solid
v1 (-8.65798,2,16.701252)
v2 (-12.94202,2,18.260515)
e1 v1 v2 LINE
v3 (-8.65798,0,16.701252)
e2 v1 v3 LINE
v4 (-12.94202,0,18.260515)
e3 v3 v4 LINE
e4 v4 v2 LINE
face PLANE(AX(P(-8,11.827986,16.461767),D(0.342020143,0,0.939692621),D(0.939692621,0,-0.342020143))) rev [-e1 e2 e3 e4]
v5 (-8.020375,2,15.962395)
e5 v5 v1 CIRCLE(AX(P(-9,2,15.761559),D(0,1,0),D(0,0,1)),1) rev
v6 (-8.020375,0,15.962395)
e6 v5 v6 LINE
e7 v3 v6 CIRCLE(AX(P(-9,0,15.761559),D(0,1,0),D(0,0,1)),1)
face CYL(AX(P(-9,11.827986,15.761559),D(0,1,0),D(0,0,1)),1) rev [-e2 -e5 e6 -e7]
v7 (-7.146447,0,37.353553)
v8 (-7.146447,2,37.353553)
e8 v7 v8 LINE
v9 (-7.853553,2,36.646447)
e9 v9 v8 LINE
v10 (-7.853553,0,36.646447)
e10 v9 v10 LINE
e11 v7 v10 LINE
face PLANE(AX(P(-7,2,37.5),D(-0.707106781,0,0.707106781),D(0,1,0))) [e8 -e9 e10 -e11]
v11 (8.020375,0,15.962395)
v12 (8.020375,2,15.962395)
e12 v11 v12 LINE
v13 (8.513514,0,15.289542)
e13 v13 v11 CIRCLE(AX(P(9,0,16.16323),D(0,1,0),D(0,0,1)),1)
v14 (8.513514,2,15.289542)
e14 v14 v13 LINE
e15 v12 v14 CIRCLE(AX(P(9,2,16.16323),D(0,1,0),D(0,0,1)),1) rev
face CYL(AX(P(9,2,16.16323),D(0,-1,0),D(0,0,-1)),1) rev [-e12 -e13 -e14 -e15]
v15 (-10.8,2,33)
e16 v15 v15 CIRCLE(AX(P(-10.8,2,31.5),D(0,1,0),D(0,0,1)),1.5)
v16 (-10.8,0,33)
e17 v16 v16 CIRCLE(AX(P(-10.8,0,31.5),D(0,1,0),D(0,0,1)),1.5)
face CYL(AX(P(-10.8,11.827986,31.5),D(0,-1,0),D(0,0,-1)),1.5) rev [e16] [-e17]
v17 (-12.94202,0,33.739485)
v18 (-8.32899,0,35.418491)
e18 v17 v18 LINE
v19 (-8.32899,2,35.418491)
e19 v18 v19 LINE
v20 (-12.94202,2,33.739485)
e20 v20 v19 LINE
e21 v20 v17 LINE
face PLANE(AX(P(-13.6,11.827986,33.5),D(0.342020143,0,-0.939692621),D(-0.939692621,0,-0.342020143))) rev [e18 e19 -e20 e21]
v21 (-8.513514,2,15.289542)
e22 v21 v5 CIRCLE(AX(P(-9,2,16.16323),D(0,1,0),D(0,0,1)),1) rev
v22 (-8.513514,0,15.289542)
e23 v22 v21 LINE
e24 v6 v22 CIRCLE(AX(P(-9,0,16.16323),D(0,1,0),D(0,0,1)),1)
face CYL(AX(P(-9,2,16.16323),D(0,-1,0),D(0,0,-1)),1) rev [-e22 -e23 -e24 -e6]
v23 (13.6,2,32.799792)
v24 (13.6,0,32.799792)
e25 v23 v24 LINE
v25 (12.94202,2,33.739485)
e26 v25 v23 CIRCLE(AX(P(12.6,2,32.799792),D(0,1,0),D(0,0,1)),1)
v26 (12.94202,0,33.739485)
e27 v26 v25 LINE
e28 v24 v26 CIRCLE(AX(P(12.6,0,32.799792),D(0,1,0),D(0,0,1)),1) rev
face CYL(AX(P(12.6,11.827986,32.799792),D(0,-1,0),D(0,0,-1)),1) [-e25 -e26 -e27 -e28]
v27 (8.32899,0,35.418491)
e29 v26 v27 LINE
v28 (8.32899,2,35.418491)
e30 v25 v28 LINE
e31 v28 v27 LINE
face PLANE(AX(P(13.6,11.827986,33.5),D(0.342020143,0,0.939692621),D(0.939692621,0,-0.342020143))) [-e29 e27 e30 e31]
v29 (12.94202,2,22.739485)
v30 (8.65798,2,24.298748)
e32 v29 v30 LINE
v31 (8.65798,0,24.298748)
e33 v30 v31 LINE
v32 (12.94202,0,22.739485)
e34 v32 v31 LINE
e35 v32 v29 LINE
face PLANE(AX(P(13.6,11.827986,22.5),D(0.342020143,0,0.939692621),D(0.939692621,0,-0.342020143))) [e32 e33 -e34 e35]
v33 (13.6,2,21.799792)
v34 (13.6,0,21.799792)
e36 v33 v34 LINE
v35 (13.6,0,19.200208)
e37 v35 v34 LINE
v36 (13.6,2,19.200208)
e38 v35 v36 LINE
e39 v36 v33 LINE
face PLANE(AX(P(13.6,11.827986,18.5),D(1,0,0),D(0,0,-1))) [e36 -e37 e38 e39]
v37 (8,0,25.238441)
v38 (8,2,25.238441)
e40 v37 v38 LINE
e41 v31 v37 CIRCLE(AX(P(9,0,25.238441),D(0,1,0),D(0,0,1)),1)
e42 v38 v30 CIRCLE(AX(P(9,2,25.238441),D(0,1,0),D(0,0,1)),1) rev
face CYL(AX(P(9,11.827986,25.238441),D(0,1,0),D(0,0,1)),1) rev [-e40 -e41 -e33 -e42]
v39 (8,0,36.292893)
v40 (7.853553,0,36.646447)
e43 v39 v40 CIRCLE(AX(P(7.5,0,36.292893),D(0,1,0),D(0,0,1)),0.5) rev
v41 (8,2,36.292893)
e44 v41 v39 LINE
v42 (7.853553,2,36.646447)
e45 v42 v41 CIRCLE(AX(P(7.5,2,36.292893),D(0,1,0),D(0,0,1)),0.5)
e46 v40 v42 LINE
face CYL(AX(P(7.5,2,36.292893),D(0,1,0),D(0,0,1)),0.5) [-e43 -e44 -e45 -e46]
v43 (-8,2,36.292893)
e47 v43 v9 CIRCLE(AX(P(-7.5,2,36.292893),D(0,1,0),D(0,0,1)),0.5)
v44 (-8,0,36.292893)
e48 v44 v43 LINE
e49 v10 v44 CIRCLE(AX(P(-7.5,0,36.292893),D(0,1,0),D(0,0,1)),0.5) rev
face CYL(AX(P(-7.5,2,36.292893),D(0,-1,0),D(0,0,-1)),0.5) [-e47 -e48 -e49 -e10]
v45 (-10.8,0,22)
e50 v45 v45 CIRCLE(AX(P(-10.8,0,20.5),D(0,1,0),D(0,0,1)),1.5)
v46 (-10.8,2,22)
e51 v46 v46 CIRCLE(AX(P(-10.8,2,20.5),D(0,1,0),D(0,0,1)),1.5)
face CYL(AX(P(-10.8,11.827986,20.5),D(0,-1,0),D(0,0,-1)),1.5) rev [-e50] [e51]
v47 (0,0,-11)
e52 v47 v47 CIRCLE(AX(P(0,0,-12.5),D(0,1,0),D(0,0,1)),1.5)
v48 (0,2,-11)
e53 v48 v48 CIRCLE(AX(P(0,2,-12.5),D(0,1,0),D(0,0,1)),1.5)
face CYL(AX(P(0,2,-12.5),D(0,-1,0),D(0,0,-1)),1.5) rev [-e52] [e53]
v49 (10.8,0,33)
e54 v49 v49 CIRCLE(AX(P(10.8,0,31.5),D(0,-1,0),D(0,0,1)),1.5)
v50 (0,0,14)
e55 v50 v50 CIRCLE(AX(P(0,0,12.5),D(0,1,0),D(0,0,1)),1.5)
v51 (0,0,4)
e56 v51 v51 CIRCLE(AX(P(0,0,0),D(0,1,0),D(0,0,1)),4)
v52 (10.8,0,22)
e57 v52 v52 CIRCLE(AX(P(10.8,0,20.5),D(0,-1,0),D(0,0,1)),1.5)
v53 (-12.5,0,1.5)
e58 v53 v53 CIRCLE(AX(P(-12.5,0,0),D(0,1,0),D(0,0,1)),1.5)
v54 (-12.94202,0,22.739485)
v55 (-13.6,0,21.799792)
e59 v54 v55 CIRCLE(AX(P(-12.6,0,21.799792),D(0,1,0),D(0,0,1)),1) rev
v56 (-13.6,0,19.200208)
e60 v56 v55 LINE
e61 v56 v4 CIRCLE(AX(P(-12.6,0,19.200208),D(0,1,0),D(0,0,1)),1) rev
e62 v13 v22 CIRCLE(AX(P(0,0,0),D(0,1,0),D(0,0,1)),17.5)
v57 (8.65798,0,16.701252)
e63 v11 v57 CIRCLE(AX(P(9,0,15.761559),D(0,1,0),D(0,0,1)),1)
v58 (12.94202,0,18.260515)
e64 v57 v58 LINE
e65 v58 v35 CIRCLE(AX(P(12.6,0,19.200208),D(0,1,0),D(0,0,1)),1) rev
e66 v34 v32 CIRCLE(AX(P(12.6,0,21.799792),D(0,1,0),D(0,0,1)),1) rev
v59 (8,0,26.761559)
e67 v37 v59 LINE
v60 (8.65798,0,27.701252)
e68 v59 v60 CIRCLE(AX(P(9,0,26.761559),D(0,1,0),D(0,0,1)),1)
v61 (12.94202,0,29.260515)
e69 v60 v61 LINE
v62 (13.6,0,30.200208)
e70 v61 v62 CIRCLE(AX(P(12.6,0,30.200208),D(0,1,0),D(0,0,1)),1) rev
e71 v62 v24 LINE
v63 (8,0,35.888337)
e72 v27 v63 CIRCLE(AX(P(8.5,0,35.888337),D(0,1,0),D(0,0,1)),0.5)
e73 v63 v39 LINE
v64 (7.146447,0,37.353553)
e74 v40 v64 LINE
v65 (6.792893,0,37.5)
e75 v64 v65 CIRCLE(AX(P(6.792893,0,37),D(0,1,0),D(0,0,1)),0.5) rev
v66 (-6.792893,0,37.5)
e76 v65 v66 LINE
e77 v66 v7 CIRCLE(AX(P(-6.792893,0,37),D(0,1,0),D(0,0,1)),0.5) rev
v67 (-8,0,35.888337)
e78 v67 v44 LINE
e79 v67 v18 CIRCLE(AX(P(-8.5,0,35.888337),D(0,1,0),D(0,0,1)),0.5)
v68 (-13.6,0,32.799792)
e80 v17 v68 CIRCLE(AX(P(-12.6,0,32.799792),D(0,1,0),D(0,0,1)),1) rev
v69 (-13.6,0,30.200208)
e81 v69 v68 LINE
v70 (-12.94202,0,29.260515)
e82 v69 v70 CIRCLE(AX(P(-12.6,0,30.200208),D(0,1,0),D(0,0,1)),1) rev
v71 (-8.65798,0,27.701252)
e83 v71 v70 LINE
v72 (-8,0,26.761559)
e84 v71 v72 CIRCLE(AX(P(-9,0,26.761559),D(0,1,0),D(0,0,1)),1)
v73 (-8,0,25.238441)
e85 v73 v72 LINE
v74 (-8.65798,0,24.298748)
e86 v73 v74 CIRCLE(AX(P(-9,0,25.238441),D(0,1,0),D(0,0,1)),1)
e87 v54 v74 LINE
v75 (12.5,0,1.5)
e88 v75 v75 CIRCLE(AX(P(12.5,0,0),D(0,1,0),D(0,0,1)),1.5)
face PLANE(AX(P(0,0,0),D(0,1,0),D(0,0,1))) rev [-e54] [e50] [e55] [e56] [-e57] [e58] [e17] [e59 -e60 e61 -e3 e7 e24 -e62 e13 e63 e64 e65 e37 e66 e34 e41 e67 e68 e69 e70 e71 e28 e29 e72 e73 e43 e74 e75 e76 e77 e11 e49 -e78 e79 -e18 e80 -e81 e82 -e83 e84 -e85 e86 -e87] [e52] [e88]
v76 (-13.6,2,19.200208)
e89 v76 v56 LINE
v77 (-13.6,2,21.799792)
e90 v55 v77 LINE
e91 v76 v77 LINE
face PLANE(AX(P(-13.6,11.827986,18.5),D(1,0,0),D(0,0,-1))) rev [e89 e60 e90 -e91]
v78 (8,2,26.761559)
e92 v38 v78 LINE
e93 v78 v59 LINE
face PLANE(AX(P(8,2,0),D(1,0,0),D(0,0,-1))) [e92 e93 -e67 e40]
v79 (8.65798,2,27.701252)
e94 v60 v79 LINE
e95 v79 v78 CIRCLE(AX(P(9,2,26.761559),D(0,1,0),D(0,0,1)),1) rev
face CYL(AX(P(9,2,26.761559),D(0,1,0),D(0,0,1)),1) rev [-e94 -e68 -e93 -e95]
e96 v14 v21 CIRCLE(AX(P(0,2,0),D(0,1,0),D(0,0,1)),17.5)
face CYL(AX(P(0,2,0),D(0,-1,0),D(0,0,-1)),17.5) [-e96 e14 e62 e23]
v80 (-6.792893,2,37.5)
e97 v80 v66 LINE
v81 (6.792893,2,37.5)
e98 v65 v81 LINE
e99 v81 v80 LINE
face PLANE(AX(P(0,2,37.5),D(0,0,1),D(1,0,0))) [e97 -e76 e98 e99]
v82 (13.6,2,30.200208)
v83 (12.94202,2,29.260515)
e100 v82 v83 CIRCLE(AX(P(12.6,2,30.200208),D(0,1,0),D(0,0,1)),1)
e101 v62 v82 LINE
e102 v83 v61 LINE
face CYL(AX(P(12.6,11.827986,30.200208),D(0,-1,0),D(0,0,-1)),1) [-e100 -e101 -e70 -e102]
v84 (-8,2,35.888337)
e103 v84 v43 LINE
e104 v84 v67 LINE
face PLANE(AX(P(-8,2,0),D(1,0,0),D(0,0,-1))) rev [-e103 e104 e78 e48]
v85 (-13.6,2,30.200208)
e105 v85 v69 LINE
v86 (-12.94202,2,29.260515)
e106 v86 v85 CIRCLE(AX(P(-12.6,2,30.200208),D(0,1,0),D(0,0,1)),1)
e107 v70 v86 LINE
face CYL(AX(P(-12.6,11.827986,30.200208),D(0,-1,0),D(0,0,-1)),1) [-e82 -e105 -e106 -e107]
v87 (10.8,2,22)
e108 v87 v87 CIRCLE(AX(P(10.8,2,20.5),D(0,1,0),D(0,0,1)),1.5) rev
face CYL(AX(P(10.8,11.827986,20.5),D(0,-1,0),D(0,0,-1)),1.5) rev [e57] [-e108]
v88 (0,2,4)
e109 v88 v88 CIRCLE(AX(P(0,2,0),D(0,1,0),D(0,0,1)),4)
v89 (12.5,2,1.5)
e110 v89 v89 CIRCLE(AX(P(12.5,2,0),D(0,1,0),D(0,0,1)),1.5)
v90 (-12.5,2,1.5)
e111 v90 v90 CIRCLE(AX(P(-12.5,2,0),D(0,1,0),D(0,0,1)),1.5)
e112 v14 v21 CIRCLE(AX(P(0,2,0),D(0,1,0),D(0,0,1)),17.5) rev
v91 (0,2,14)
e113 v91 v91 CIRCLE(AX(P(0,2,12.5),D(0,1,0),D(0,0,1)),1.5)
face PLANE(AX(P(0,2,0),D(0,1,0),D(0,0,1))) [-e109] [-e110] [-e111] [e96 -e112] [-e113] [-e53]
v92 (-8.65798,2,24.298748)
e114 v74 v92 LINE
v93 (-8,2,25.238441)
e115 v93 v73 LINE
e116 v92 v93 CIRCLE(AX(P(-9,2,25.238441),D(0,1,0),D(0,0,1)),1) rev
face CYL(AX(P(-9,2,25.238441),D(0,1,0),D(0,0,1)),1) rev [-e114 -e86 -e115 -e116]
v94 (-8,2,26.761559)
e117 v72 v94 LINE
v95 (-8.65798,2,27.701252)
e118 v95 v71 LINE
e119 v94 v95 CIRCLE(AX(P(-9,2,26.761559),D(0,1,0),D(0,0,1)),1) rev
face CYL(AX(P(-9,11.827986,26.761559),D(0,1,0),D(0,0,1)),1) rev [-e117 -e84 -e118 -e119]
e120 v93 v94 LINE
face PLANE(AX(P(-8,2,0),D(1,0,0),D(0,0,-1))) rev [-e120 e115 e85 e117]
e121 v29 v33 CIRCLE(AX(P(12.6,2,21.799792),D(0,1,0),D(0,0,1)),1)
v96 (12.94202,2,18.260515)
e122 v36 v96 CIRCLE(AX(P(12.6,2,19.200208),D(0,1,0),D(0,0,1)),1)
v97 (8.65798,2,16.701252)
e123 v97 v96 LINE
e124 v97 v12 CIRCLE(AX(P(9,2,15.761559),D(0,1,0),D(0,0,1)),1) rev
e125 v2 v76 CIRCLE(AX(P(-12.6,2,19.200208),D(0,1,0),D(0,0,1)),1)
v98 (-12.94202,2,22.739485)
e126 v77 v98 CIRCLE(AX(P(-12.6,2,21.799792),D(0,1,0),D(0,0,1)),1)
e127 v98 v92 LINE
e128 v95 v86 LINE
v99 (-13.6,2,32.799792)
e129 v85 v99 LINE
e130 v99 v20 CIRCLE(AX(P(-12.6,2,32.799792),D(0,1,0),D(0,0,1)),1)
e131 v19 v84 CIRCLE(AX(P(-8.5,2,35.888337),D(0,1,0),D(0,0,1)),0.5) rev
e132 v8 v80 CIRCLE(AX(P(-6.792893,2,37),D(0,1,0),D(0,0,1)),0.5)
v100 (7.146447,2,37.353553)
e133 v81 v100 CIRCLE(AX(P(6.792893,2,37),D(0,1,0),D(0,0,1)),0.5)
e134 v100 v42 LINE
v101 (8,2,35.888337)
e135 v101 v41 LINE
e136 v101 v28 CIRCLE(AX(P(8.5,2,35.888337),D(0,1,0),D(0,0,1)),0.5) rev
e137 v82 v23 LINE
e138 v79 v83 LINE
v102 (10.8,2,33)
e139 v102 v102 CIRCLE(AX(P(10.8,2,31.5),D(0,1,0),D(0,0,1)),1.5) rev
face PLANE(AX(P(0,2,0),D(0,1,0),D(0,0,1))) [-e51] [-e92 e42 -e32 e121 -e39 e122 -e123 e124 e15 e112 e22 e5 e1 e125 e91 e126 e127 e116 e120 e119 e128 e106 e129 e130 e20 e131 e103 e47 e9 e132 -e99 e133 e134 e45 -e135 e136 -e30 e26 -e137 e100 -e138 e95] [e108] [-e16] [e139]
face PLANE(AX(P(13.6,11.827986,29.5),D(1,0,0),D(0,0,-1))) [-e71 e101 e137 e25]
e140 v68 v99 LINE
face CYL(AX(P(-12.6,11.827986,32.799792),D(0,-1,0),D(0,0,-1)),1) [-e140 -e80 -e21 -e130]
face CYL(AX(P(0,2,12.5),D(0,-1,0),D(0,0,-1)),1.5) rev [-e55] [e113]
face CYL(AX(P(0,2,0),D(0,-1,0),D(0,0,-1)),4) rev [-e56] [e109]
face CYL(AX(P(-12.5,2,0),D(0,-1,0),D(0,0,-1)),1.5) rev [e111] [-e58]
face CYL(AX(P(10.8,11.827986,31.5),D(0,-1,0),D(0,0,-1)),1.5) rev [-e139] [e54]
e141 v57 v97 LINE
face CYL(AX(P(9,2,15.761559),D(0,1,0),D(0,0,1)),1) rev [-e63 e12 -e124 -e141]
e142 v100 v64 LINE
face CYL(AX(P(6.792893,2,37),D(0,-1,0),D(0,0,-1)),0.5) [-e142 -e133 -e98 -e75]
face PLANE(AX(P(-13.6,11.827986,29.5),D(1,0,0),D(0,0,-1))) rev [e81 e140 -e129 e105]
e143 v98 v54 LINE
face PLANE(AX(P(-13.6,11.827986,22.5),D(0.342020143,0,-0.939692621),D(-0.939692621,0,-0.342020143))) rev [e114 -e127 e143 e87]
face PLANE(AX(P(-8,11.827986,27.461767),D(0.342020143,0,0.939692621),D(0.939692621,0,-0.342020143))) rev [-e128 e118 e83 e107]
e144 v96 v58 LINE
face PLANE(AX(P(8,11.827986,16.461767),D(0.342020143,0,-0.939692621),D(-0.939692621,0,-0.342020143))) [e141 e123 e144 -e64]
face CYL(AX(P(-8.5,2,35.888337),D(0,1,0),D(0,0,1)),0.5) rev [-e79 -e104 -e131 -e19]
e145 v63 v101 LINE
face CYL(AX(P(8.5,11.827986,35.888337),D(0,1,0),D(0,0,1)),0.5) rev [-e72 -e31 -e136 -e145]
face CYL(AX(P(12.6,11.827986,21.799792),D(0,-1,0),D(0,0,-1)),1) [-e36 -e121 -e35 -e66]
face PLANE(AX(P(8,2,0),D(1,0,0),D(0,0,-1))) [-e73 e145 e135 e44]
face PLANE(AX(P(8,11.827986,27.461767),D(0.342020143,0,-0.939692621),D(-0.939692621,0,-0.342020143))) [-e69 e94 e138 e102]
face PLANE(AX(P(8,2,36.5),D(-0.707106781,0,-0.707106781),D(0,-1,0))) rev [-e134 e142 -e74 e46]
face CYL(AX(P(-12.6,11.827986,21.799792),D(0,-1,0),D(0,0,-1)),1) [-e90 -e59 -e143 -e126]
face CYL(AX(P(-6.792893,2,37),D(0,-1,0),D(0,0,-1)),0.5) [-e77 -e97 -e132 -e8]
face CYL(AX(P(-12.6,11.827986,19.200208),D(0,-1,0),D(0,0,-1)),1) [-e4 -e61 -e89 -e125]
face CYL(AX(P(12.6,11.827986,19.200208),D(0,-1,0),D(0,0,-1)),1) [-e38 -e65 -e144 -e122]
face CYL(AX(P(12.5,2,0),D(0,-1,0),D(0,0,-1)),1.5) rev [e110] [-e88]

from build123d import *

# Parameters (mm, degrees)
SKETCH1_R           = 17.5
SKETCH1_R_2         = 1.5
SKETCH1_R_3         = 4
BOSS_EXTRUDE1_DEPTH = 2
BOSS_EXTRUDE2_DEPTH = 2
SKETCH3_R           = 1.5
BOSS_EXTRUDE4_DEPTH = 2
FILLET1_R           = 1
CHAMFER1_SIZE       = 1
FILLET2_R           = 0.5


with BuildPart() as part:
    # Sketch1 → Boss-Extrude1 (new body)
    with BuildSketch(Plane(origin=(0, 0, 0), x_dir=(1, 0, 0), z_dir=(0, 1, 0))):
        with Locations(Location((0, 0, 0), (0, 0, 270))):
            Circle(SKETCH1_R)
        with Locations(Location((-12.5, 0, 0), (0, 0, 270))):
            Circle(SKETCH1_R_2, mode=Mode.SUBTRACT)
        with Locations(Location((0, -12.5, 0), (0, 0, 270))):
            Circle(SKETCH1_R_2, mode=Mode.SUBTRACT)
        with Locations(Location((12.5, 0, 0), (0, 0, 270))):
            Circle(SKETCH1_R_2, mode=Mode.SUBTRACT)
        with Locations(Location((0, 12.5, 0), (0, 0, 270))):
            Circle(SKETCH1_R_2, mode=Mode.SUBTRACT)
        with Locations(Location((0, 0, 0), (0, 0, 270))):
            Circle(SKETCH1_R_3, mode=Mode.SUBTRACT)
    extrude(amount=BOSS_EXTRUDE1_DEPTH)

    # Sketch2 → Boss-Extrude2 (add)
    with BuildSketch(Plane(origin=(0, 0, 0), x_dir=(1, 0, 0), z_dir=(0, 1, 0))):
        with BuildLine():
            Line((-8, -37.5), (8, -37.5))
            Line((8, -37.5), (8, -15.564382416))
            ThreePointArc((8, -15.564382416), (0, -17.5), (-8, -15.564382416))
            Line((-8, -15.564382416), (-8, -37.5))
        make_face()
    extrude(amount=BOSS_EXTRUDE2_DEPTH)

    # Sketch3 → Boss-Extrude4 (add)
    # profile 1 of 2: a face of its own
    with BuildSketch(Plane(origin=(0, 0, 0), x_dir=(1, 0, 0), z_dir=(0, 1, 0))):
        Polygon((-13.6, -18.5), (-13.6, -22.5), (-8, -24.538233312), (-8, -16.461766688), align=None)
        with Locations(Location((-10.8, -20.5, 0), (0, 0, 270))):
            Circle(SKETCH3_R, mode=Mode.SUBTRACT)
    # profile 2 of 2: a face of its own
    with BuildSketch(Plane(origin=(0, 0, 0), x_dir=(1, 0, 0), z_dir=(0, 1, 0))):
        Polygon((-13.6, -29.5), (-13.6, -33.5), (-8, -35.538233312), (-8, -27.461766688), align=None)
        with Locations(Location((-10.8, -31.5, 0), (0, 0, 270))):
            Circle(SKETCH3_R, mode=Mode.SUBTRACT)
    boss_extrude4 = extrude(amount=BOSS_EXTRUDE4_DEPTH)

    # Mirror1: Boss-Extrude4 across plane
    add(boss_extrude4.mirror(Plane(origin=(0, 0, 0), x_dir=(0, 0, 1), z_dir=(1, 0, 0))))

    # Fillet1
    # the kernel refuses this fillet: 1 mm, written as the material it adds along each edge
    with BuildSketch(Plane(origin=(8, 0, 15.564382416), x_dir=(0.8816627769698464, 0, -0.4718800140987312), z_dir=(0, 1, 0))) as fillet1_piece_1:
        with BuildLine():
            CenterArc((0.59907863, -0.999861528), FILLET1_R, 90.953507264, 60.89009106)
            Line((-0.282584147, -0.527981514), (0, 0))
            ThreePointArc((0, 0), (0.291218778, -0.002423264), (0.582437557, 0))
        make_face()
    extrude(amount=2)
    with BuildSketch(Plane(origin=(-8, 0, 15.564382416), x_dir=(-0.8816627769698451, 0, -0.4718800140987337), z_dir=(0, 1, 0))) as fillet1_piece_2:
        with BuildLine():
            CenterArc((0.59907863, 0.999861528), FILLET1_R, 208.156401676, 60.89009106)
            Line((-0.282584147, 0.527981514), (0, 0))
            ThreePointArc((0, 0), (0.291218778, 0.002423264), (0.582437557, 0))
        make_face()
    extrude(amount=2)
    with BuildSketch(Plane(origin=(-8, 0, 24.538233312), x_dir=(-0.9396926207859061, 0, -0.342020143325675), z_dir=(0, 1, 0)), Plane(origin=(-8, 0, 16.461766688), x_dir=(0, 0, -1), z_dir=(0, 1, 0)), Plane(origin=(-8, 0, 27.461766688), x_dir=(0, 0, -1), z_dir=(0, 1, 0)), Plane(origin=(8, 0, 24.538233312), x_dir=(0, 0, 1), z_dir=(0, 1, 0))) as fillet1_piece_3:
        with BuildLine():
            CenterArc((FILLET1_R * 0.70020753821, FILLET1_R), FILLET1_R, 200, 70)
            Line((-FILLET1_R * 0.239485082576, FILLET1_R * 0.657979856674), (0, 0))
            Line((0, 0), (FILLET1_R * 0.70020753821, 0))
        make_face()
    extrude(amount=2)
    with BuildSketch(Plane(origin=(8, 0, 16.461766688), x_dir=(0, 0, -1), z_dir=(0, 1, 0)), Plane(origin=(8, 0, 27.461766688), x_dir=(0, 0, -1), z_dir=(0, 1, 0))) as fillet1_piece_4:
        with BuildLine():
            CenterArc((FILLET1_R * 0.70020753821, -FILLET1_R), FILLET1_R, 90, 70)
            Line((-FILLET1_R * 0.239485082576, -FILLET1_R * 0.657979856674), (0, 0))
            Line((0, 0), (FILLET1_R * 0.70020753821, 0))
        make_face()
    extrude(amount=2)
    # the kernel refuses this fillet: 1 mm, written as the material it takes off along each edge
    with BuildSketch(Plane(origin=(-13.6, -1.750518846, 22.5), x_dir=(0, 0, -1), z_dir=(0, 1, 0)), Plane(origin=(-13.6, -1.750518846, 18.5), x_dir=(0.9396926207859061, 0, -0.342020143325675), z_dir=(0, 1, 0)), Plane(origin=(-13.6, -1.750518846, 33.5), x_dir=(0, 0, -1), z_dir=(0, 1, 0)), Plane(origin=(-13.6, -1.750518846, 29.5), x_dir=(0.9396926207859078, 0, -0.3420201433256705), z_dir=(0, 1, 0)), Plane(origin=(13.6, -1.750518846, 18.5), x_dir=(0, 0, 1), z_dir=(0, 1, 0)), Plane(origin=(13.6, -1.750518846, 22.5), x_dir=(-0.9396926207859078, 0, 0.3420201433256705), z_dir=(0, 1, 0)), Plane(origin=(13.6, -1.750518846, 29.5), x_dir=(0, 0, 1), z_dir=(0, 1, 0)), Plane(origin=(13.6, -1.750518846, 33.5), x_dir=(-0.9396926207859061, 0, 0.342020143325675), z_dir=(0, 1, 0))) as fillet1_2_piece_1:
        with BuildLine():
            CenterArc((FILLET1_R * 0.70020753821, -FILLET1_R), FILLET1_R, 90, 70)
            Line((-FILLET1_R * 0.239485082576, -FILLET1_R * 0.657979856674), (0, 0))
            Line((0, 0), (FILLET1_R * 0.70020753821, 0))
        make_face()
    extrude(amount=5.501037691, mode=Mode.SUBTRACT)

    # Chamfer1
    chamfer1_edges = [part.edges().sort_by_distance(p)[0] for p in [
        (-8, 1, 37.5),
        (8, 1, 37.5),
    ]]
    chamfer(chamfer1_edges, length=CHAMFER1_SIZE)

    # Fillet2
    fillet2_edges = [part.edges().sort_by_distance(p)[0] for p in [
        (7, 1, 37.5),
        (-7, 1, 37.5),
        (-8, 1, 36.5),
        (8, 1, 36.5),
        (-8, 1, 35.538233312),
        (8, 1, 35.538233312),
    ]]
    fillet(fillet2_edges, radius=FILLET2_R)


solid = part.part
